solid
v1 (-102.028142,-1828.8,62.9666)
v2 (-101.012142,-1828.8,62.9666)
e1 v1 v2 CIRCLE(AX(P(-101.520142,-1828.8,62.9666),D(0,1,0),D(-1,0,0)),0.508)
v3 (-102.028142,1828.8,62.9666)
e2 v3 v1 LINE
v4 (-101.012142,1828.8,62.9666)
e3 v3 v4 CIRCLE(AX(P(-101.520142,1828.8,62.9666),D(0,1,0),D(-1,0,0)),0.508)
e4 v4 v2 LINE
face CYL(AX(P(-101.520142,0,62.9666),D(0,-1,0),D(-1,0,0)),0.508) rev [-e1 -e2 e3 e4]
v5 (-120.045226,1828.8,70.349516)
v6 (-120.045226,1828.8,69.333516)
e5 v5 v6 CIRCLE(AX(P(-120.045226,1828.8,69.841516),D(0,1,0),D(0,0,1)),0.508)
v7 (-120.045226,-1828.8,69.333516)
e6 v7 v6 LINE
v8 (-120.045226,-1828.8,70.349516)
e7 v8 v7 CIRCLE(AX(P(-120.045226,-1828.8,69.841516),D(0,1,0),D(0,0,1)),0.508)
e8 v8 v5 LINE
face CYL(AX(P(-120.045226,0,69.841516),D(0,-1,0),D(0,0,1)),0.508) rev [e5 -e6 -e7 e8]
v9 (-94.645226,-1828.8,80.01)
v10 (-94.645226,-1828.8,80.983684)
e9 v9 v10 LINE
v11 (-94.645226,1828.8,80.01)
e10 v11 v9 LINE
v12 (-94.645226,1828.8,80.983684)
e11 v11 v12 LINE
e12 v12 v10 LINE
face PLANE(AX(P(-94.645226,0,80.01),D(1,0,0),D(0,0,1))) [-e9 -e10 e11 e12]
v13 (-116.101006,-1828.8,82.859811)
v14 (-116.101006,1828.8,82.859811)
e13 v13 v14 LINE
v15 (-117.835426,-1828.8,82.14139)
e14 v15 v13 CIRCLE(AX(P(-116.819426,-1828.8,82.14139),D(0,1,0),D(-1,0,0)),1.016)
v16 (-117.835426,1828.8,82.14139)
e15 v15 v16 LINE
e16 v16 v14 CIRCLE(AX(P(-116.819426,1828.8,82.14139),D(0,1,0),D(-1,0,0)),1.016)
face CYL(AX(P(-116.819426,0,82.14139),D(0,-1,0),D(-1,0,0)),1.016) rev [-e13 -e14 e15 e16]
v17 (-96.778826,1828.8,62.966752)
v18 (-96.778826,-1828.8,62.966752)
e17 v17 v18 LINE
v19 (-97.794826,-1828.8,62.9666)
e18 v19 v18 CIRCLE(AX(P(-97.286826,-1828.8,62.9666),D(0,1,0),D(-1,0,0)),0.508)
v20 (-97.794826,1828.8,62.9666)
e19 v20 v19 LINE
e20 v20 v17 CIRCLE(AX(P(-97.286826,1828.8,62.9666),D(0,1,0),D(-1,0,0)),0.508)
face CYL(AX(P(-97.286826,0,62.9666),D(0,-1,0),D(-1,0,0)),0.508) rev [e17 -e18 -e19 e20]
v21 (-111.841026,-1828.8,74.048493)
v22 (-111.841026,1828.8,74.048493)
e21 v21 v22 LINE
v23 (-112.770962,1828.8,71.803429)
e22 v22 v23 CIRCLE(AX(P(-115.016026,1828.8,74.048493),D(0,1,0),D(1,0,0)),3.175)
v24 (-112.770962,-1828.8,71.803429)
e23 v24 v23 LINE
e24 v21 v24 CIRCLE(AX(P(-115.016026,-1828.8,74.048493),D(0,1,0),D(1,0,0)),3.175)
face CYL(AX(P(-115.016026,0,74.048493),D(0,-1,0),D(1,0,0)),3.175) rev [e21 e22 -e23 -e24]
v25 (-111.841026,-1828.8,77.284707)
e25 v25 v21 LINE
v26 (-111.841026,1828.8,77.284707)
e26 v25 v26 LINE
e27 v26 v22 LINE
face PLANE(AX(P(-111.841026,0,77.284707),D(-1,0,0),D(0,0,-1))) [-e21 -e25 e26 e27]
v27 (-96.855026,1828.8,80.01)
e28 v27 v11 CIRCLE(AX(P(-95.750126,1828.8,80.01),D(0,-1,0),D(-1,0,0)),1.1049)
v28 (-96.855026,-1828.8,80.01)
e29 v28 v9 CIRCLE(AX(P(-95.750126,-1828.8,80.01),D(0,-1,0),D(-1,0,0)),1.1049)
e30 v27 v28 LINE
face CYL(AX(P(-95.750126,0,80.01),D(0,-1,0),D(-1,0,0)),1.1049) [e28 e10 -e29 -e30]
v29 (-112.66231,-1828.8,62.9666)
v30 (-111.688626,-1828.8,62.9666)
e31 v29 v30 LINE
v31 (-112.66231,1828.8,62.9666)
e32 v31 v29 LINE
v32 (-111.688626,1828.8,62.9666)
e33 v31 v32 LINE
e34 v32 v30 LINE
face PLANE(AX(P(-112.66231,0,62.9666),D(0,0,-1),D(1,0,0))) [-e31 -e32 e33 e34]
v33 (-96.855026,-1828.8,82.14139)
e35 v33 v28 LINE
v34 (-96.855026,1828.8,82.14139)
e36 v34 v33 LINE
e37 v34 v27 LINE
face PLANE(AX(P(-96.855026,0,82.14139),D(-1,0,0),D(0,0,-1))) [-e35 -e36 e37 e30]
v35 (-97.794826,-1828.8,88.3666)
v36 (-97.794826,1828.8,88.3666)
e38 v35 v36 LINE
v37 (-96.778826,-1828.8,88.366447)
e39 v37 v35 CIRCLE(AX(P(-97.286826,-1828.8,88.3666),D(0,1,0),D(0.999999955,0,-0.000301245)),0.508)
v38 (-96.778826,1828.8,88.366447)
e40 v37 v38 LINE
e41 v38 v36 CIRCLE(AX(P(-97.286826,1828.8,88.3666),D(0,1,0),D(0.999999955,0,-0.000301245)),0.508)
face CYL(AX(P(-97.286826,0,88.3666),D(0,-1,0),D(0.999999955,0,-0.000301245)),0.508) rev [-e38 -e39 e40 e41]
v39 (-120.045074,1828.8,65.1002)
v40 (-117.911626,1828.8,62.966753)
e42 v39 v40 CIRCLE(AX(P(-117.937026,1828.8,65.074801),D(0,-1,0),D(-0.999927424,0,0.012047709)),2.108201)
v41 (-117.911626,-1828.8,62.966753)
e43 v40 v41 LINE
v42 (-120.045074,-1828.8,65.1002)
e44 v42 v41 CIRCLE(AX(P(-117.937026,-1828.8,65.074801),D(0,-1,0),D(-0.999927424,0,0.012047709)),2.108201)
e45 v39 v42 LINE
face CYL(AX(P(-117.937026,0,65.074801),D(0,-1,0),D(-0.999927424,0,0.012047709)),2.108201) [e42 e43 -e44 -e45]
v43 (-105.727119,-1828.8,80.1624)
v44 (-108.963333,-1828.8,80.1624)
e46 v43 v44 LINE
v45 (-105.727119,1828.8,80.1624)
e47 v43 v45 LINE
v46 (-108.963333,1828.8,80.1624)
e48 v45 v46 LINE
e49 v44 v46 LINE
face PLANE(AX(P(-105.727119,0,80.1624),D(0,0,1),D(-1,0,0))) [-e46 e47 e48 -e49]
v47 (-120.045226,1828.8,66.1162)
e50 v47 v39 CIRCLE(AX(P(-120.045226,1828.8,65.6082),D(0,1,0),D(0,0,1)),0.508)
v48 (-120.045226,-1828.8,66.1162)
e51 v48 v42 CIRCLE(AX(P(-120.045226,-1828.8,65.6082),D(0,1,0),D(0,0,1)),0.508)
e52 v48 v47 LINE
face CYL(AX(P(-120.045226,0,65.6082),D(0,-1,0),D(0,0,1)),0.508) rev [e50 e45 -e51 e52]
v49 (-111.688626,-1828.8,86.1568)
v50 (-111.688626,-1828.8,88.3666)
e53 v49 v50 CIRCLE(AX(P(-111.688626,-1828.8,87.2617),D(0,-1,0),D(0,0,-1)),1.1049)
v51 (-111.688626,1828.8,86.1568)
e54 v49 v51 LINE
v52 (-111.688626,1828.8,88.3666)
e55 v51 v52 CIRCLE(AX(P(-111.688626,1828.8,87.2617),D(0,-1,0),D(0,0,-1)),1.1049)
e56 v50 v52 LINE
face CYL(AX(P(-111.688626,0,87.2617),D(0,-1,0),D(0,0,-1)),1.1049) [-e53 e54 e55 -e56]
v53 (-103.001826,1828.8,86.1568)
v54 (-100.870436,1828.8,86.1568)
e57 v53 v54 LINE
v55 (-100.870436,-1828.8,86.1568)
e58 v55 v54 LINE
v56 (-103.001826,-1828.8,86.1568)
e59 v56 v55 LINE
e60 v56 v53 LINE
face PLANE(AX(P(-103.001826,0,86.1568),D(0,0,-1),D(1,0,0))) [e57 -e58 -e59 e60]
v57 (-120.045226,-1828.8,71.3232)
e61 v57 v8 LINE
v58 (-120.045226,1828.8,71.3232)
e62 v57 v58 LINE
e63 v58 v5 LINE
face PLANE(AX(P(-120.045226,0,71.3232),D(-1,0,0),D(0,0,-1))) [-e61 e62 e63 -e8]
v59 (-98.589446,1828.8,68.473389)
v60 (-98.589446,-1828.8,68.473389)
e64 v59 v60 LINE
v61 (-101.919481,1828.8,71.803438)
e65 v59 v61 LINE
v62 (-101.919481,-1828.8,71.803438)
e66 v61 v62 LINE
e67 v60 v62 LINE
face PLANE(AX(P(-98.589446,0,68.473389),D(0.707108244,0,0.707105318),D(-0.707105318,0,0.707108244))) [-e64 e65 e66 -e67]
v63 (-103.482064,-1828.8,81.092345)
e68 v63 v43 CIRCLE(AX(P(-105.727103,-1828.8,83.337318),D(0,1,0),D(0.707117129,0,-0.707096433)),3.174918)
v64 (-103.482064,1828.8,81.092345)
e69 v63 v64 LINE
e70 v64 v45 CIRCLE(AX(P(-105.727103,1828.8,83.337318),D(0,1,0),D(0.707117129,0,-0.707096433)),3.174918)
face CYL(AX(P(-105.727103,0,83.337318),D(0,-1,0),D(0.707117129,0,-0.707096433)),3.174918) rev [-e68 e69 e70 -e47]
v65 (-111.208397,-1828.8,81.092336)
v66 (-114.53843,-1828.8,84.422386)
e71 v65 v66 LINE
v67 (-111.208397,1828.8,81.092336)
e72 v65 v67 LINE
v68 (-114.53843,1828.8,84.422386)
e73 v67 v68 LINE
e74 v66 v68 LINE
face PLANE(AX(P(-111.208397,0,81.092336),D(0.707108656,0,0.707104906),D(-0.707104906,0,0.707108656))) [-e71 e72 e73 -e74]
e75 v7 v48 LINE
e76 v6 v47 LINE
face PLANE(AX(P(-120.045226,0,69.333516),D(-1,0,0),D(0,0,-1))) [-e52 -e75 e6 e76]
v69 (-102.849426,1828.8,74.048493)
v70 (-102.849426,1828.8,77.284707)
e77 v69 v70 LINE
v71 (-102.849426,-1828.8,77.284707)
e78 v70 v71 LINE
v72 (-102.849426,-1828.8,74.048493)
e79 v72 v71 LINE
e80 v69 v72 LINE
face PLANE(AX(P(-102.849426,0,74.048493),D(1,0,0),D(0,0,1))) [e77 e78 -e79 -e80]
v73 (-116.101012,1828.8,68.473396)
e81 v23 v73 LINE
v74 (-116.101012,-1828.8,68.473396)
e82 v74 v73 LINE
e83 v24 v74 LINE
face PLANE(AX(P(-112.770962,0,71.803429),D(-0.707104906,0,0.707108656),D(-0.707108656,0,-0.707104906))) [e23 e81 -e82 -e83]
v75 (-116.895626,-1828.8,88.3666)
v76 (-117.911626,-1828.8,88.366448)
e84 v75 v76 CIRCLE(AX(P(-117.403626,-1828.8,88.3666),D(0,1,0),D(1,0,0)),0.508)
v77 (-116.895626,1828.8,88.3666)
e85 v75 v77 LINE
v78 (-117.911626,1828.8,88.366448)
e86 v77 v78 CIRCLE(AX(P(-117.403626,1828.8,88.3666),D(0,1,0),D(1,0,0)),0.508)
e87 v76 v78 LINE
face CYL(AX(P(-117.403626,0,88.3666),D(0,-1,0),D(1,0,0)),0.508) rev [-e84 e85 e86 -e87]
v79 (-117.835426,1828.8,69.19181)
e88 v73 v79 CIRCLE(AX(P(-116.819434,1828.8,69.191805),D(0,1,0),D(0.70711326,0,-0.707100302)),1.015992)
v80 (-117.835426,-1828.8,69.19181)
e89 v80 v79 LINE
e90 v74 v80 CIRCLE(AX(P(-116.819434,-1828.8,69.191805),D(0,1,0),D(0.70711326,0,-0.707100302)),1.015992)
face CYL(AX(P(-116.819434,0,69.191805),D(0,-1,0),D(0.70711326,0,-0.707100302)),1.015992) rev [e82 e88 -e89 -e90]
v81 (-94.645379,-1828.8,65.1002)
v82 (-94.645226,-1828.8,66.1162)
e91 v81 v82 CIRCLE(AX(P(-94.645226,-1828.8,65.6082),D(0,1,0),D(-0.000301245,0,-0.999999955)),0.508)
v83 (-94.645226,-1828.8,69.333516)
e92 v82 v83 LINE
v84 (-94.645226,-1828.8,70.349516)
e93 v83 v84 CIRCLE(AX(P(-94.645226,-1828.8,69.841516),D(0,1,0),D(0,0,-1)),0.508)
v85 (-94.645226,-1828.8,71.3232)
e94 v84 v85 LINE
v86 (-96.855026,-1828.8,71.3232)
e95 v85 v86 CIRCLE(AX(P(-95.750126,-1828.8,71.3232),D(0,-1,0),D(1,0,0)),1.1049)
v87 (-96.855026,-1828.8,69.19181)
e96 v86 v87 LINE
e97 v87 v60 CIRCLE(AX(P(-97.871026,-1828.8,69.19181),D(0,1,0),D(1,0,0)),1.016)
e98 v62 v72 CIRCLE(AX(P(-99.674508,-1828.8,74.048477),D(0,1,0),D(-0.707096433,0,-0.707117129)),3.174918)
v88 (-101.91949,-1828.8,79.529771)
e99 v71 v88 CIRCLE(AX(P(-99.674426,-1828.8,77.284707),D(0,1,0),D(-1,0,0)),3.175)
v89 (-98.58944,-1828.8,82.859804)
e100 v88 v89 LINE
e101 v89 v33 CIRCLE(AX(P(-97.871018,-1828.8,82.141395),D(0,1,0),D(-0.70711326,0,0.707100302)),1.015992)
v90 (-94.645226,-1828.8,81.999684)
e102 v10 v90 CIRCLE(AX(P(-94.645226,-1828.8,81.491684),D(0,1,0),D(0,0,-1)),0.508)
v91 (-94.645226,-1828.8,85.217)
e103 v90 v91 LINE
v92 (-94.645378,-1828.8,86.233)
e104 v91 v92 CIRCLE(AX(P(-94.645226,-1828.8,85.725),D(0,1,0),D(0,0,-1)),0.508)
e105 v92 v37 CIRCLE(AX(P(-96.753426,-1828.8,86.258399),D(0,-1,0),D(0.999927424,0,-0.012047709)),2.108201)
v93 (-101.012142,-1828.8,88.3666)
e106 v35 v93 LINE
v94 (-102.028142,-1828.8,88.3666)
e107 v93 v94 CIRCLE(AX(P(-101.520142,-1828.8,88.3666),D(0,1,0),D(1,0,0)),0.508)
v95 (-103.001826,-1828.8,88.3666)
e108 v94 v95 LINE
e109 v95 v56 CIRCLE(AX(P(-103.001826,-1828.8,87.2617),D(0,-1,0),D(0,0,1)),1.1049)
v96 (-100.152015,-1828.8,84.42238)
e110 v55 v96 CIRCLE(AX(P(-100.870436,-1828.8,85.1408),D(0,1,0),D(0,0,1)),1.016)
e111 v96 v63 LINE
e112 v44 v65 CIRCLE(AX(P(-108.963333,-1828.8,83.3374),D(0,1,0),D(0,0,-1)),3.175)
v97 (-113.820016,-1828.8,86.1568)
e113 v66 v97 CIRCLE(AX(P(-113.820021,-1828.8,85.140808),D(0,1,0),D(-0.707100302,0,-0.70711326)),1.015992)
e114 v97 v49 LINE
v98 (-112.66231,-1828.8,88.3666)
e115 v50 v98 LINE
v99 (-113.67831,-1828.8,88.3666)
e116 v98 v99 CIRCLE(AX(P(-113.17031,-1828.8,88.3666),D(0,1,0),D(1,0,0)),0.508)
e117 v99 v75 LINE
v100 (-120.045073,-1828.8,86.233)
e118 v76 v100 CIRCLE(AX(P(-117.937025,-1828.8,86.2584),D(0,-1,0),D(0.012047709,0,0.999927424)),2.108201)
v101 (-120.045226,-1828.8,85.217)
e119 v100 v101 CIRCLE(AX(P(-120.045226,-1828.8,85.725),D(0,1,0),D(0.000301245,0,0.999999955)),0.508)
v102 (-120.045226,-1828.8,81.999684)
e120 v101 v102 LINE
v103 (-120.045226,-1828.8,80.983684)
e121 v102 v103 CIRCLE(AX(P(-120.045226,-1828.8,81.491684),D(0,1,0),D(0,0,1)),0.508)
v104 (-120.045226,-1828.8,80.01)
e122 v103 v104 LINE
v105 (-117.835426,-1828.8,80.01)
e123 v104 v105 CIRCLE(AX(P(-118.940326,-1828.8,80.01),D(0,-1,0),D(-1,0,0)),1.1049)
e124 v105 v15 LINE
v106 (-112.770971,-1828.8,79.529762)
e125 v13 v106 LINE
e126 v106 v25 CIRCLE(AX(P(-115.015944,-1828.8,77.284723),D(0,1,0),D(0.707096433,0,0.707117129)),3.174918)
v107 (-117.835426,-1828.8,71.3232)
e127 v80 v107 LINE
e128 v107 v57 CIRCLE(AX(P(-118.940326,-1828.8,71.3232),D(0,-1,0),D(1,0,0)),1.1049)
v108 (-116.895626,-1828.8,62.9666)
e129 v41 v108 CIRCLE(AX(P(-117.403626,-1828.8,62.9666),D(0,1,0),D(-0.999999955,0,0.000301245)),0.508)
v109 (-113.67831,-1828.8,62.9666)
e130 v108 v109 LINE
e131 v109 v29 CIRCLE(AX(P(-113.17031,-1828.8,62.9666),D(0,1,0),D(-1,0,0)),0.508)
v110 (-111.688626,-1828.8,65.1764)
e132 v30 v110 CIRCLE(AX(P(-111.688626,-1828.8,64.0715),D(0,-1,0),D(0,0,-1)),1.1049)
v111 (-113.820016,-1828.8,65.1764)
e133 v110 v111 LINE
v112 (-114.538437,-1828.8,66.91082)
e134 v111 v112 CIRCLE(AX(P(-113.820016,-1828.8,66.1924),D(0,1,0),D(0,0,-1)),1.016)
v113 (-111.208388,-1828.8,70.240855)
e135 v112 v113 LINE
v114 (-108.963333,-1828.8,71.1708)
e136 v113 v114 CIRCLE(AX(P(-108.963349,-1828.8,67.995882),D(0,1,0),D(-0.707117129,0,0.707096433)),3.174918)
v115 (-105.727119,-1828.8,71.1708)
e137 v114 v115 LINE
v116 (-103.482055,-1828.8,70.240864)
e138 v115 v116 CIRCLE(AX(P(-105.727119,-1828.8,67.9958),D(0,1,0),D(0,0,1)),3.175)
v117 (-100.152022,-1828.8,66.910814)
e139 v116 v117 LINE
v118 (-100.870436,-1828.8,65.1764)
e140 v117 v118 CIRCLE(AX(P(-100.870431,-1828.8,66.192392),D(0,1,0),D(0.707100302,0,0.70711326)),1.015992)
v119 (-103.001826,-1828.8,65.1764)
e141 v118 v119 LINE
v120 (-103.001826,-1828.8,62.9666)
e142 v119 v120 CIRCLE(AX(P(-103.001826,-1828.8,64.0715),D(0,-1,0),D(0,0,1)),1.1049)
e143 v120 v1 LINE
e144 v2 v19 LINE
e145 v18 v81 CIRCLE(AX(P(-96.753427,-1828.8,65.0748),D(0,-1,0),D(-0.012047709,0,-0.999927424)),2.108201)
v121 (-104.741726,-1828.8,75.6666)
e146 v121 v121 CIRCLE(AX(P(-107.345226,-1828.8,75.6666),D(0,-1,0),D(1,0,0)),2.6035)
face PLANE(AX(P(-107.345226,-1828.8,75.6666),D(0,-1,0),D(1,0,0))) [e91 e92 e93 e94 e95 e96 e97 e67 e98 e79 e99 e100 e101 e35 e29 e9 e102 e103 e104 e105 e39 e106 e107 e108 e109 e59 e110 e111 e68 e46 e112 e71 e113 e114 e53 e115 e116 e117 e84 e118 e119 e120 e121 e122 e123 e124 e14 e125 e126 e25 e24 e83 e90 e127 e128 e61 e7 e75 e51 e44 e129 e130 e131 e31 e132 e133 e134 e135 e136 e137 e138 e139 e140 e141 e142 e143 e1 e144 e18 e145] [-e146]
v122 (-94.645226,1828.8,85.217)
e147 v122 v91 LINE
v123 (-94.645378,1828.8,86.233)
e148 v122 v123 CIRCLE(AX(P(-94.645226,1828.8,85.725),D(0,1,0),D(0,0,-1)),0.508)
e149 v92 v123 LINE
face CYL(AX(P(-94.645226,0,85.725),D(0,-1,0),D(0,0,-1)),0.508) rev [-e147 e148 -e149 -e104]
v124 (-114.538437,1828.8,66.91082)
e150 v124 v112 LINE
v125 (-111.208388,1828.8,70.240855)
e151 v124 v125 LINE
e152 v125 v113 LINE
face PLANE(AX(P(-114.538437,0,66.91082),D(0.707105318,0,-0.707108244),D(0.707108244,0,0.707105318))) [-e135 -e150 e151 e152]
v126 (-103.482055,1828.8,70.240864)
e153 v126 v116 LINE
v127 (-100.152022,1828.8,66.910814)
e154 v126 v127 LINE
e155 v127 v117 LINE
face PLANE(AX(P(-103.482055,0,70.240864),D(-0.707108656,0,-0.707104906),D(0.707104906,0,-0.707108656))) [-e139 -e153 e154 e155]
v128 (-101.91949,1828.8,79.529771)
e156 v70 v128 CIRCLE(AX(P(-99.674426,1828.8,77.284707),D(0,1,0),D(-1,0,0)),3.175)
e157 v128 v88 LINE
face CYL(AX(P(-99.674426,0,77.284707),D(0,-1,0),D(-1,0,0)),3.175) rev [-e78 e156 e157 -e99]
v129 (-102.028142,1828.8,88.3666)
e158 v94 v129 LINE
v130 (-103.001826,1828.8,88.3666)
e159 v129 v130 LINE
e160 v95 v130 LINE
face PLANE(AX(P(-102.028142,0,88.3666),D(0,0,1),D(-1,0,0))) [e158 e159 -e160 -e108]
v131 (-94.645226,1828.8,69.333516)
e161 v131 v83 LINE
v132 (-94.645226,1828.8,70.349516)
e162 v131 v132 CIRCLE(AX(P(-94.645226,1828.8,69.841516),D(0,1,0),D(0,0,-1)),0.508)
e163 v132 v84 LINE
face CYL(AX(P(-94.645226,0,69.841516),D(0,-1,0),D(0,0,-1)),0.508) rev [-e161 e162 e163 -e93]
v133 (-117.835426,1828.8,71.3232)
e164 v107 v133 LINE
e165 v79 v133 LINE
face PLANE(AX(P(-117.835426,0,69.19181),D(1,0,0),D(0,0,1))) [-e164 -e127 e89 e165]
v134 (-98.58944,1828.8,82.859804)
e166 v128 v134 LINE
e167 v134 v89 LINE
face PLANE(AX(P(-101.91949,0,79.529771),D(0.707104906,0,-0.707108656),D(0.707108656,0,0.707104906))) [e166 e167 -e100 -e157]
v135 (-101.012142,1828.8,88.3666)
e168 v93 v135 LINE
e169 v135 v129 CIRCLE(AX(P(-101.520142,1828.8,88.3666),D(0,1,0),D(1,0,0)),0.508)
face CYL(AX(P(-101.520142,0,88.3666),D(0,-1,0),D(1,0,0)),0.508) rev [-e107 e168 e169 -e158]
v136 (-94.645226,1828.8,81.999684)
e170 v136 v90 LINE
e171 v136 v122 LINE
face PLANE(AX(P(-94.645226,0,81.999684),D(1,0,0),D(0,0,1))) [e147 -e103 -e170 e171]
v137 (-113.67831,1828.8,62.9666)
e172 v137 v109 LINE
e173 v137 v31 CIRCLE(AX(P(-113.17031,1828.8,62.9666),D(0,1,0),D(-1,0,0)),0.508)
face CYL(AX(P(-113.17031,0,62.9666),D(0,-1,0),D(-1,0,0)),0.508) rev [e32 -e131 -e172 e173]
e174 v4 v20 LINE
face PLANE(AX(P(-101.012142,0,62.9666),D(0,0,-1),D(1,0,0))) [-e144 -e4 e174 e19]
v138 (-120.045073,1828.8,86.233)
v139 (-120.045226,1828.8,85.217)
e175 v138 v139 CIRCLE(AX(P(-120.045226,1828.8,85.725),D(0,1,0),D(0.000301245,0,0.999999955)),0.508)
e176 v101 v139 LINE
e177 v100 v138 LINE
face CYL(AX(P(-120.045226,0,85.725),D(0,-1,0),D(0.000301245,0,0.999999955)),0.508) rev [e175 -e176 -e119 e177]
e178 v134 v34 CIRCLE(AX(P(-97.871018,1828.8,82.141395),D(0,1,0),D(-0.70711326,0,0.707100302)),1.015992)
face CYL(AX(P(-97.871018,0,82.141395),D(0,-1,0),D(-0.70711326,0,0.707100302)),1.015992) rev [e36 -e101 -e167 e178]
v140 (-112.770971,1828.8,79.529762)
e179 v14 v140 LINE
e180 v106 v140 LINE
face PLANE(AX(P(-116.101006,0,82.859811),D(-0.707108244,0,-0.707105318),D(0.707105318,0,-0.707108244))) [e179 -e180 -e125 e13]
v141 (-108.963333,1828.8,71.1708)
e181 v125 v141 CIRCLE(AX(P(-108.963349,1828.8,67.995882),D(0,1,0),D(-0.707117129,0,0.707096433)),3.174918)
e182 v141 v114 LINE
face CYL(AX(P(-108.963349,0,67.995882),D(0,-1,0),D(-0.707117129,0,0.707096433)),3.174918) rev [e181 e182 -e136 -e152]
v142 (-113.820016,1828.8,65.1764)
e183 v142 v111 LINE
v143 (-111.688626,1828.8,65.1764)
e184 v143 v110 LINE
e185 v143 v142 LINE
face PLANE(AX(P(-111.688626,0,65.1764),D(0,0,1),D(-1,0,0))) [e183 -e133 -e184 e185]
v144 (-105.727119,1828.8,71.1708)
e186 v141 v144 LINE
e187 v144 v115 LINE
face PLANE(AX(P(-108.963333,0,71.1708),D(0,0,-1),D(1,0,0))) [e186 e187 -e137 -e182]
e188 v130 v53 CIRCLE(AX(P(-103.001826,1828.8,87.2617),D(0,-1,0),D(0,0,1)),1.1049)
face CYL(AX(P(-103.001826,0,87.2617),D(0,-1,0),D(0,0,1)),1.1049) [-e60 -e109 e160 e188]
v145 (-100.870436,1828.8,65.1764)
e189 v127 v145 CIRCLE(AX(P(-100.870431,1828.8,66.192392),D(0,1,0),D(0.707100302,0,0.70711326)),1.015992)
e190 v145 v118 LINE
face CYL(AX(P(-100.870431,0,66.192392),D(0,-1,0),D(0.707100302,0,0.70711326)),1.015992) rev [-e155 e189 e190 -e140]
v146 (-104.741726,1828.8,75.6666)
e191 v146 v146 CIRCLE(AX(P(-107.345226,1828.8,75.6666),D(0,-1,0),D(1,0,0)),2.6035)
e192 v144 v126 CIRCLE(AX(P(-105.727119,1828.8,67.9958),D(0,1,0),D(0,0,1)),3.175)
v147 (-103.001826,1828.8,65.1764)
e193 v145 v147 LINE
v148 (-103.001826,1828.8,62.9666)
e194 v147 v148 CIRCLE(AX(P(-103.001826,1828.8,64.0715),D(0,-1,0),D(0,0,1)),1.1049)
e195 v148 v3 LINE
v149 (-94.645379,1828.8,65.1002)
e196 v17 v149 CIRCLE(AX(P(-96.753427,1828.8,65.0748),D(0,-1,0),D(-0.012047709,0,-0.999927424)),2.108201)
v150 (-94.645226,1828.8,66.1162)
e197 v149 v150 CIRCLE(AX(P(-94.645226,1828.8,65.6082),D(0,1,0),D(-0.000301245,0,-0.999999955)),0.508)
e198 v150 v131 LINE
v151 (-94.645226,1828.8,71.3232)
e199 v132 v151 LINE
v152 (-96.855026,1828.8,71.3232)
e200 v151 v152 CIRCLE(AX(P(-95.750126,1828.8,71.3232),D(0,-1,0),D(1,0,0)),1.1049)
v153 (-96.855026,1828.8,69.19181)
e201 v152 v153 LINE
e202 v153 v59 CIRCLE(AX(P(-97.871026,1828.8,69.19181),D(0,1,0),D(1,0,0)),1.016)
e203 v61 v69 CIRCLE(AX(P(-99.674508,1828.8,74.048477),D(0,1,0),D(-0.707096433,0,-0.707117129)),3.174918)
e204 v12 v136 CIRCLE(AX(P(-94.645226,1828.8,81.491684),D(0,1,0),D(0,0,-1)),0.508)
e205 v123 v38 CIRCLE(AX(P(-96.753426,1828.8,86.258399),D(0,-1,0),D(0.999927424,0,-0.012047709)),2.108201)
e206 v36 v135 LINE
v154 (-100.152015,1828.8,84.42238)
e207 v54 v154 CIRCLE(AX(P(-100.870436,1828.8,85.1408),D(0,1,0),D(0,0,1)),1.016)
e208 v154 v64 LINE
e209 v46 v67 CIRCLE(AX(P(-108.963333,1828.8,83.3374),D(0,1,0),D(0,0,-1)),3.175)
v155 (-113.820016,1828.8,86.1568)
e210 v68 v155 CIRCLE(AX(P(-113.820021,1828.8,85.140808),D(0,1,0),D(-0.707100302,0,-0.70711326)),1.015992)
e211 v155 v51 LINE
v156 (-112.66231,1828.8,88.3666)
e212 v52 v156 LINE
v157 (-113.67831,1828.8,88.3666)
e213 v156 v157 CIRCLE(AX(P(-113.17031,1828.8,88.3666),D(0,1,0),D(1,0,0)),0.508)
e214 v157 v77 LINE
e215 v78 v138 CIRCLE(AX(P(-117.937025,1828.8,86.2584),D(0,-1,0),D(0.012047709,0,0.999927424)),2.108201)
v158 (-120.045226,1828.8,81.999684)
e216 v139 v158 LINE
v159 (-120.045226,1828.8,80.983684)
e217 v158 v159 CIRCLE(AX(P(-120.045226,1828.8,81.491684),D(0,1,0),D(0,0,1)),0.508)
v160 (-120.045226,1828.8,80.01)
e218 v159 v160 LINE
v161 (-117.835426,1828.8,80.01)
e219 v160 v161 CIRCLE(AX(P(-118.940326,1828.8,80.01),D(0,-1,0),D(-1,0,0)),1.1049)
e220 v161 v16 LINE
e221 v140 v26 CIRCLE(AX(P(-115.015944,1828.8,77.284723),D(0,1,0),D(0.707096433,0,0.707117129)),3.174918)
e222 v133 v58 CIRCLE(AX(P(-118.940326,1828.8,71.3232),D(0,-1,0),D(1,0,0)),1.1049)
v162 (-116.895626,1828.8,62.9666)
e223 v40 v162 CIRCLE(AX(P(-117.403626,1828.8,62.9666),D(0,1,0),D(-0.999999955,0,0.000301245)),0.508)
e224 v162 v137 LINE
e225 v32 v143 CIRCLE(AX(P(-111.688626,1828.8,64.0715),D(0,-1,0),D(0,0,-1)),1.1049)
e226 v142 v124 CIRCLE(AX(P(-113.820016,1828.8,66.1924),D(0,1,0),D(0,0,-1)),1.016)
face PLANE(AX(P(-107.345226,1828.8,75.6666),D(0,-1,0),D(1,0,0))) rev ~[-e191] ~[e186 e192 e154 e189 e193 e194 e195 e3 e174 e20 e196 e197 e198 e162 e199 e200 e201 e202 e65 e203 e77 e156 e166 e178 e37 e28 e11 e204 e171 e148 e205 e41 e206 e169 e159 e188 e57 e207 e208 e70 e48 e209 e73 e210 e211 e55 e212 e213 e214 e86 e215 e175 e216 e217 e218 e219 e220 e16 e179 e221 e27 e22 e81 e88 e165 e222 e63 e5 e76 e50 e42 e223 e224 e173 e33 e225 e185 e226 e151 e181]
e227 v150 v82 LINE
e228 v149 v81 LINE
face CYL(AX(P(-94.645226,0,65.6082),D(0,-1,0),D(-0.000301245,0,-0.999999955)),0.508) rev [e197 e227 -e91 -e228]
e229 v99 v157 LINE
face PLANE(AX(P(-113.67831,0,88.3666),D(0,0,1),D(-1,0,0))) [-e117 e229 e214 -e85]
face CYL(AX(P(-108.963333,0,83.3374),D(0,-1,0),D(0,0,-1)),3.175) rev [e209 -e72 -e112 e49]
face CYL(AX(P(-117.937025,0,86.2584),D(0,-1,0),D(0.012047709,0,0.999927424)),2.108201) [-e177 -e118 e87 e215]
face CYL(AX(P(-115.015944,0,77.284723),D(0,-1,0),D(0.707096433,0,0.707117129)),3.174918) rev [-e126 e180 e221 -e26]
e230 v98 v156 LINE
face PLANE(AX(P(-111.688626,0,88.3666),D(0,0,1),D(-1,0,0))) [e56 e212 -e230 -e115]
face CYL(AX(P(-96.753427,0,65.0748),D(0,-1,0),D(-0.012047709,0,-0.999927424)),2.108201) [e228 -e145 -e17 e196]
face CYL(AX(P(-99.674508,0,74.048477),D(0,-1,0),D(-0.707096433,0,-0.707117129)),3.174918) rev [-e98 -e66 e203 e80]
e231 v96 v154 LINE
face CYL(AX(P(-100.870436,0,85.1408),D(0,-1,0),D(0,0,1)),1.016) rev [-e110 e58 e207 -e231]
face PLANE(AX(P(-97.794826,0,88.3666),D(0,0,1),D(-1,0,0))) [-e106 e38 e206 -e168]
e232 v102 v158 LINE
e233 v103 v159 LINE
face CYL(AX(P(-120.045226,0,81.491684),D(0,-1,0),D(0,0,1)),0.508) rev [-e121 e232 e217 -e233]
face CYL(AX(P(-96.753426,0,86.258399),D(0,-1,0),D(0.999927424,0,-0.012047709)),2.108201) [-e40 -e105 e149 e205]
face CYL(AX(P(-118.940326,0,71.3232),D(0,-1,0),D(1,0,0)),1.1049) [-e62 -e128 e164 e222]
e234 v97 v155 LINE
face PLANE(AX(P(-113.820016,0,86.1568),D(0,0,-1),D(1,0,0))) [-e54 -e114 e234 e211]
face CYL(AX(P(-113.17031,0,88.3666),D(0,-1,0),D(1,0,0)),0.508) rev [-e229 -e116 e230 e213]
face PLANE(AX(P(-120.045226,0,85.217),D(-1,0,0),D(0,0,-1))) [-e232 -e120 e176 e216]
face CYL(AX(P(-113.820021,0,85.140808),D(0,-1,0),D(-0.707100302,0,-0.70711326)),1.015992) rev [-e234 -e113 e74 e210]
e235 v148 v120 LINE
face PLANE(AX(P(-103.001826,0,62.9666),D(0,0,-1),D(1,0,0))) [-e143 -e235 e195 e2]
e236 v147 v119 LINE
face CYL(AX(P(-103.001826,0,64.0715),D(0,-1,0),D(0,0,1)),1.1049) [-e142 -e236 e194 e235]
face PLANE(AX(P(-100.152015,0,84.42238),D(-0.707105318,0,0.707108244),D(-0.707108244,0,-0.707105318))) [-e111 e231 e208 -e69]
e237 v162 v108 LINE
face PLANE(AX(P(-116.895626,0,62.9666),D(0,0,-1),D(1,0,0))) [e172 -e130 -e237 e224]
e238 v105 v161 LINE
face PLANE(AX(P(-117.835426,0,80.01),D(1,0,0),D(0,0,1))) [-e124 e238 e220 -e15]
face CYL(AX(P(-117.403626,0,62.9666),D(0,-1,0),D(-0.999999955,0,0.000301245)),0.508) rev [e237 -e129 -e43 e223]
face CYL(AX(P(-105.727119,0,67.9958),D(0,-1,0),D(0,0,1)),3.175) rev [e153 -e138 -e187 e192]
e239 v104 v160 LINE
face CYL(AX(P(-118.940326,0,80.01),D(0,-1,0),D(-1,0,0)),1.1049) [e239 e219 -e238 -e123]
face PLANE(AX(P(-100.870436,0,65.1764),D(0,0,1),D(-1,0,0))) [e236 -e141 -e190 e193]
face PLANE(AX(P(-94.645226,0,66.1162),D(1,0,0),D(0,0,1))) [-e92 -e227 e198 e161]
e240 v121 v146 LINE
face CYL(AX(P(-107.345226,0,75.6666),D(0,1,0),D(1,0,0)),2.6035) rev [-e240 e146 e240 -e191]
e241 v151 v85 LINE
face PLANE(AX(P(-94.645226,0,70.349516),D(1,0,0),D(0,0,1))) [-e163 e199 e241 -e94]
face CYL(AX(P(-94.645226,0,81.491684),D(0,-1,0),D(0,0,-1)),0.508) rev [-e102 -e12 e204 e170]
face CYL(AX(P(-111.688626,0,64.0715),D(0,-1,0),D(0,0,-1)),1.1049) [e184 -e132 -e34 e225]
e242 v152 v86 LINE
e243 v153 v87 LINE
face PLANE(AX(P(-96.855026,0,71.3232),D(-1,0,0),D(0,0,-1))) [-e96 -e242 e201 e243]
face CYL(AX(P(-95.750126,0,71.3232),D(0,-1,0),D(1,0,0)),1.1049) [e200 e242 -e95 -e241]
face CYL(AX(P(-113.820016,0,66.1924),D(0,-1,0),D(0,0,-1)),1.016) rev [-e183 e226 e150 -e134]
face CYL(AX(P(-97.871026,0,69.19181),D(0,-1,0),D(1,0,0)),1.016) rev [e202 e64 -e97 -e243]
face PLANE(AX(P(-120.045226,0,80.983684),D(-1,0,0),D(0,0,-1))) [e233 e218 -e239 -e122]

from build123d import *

# Parameters (mm, degrees)
F0_R     = 2.6035
F1_DEPTH = 1828.8


# Not quite as in the source:
# - ends of sketch curves that miss each other by under 0.0002 mm in the source are joined


with BuildPart() as f1:
    # F0 (on Front) → F1 (new body, symmetric)
    with BuildSketch(Plane.XZ):
        with BuildLine():
            ThreePointArc((-120.045226, 66.1162), (-119.5372260057, 65.6082762), (-120.0450736, 65.1002000229))
            ThreePointArc((-120.0450736, 65.1002000229), (-119.4277485161, 63.5840774839), (-117.9116260074, 62.9667530175))
            ThreePointArc((-117.9116260074, 62.9667530175), (-117.4035498, 63.4745999943), (-116.895626, 62.9666))
            Line((-116.895626, 62.9666), (-113.6783096, 62.9666))
            ThreePointArc((-113.6783096, 62.9666), (-113.1703096, 63.4746), (-112.6623096, 62.9666))
            Line((-112.6623096, 62.9666), (-111.688626, 62.9666))
            ThreePointArc((-111.688626, 62.9666), (-110.583726, 64.0715), (-111.688626, 65.1764))
            Line((-111.688626, 65.1764), (-113.8200162, 65.1764))
            ThreePointArc((-113.8200162, 65.1764), (-114.758677805, 65.8035936327), (-114.5384366897, 66.9108204897))
            Line((-114.5384366897, 66.9108204897), (-111.2083882, 70.2408552))
            ThreePointArc((-111.2083882, 70.2408552), (-110.1783528978, 70.9291175157), (-108.963333, 71.1708))
            Line((-108.963333, 71.1708), (-105.727119, 71.1708))
            ThreePointArc((-105.727119, 71.1708), (-104.5120991022, 70.9291175157), (-103.4820549697, 70.2408640303))
            Line((-103.4820549697, 70.2408640303), (-100.1520222, 66.9108136))
            ThreePointArc((-100.1520222, 66.9108136), (-99.931774195, 65.8035936327), (-100.8704358, 65.1764))
            Line((-100.8704358, 65.1764), (-103.001826, 65.1764))
            ThreePointArc((-103.001826, 65.1764), (-104.106726, 64.0715), (-103.001826, 62.9666))
            Line((-103.001826, 62.9666), (-102.0281424, 62.9666))
            ThreePointArc((-102.0281424, 62.9666), (-101.5201424, 63.4746), (-101.0121424, 62.9666))
            Line((-101.0121424, 62.9666), (-97.794826, 62.9666))
            ThreePointArc((-97.794826, 62.9666), (-97.2869022, 63.4745999943), (-96.7788260229, 62.9667524))
            ThreePointArc((-96.7788260229, 62.9667524), (-95.2627034839, 63.5840774839), (-94.6453790175, 65.1001999926))
            ThreePointArc((-94.6453790175, 65.1001999926), (-95.1532259943, 65.6082762), (-94.645226, 66.1162))
            Line((-94.645226, 66.1162), (-94.645226, 69.3335164))
            ThreePointArc((-94.645226, 69.3335164), (-95.153226, 69.8415164), (-94.645226, 70.3495164))
            Line((-94.645226, 70.3495164), (-94.645226, 71.3232))
            ThreePointArc((-94.645226, 71.3232), (-95.750126, 72.4281), (-96.855026, 71.3232))
            Line((-96.855026, 71.3232), (-96.855026, 69.1918098))
            ThreePointArc((-96.855026, 69.1918098), (-97.4822196327, 68.253148195), (-98.5894464897, 68.4733893103))
            Line((-98.5894464897, 68.4733893103), (-101.9194812, 71.8034378))
            ThreePointArc((-101.9194812, 71.8034378), (-102.6077435157, 72.8334731022), (-102.849426, 74.048493))
            Line((-102.849426, 74.048493), (-102.849426, 77.284707))
            ThreePointArc((-102.849426, 77.284707), (-102.6077435157, 78.4997268978), (-101.9194900303, 79.5297710303))
            Line((-101.9194900303, 79.5297710303), (-98.5894396, 82.8598038))
            ThreePointArc((-98.5894396, 82.8598038), (-97.4822196327, 83.080051805), (-96.855026, 82.1413902))
            Line((-96.855026, 82.1413902), (-96.855026, 80.01))
            ThreePointArc((-96.855026, 80.01), (-95.750126, 78.9051), (-94.645226, 80.01))
            Line((-94.645226, 80.01), (-94.645226, 80.9836836))
            ThreePointArc((-94.645226, 80.9836836), (-95.153226, 81.4916836), (-94.645226, 81.9996836))
            Line((-94.645226, 81.9996836), (-94.645226, 85.217))
            ThreePointArc((-94.645226, 85.217), (-95.1532259943, 85.7249238), (-94.6453784, 86.2329999771))
            ThreePointArc((-94.6453784, 86.2329999771), (-95.2627034839, 87.7491225161), (-96.7788259926, 88.3664469825))
            ThreePointArc((-96.7788259926, 88.3664469825), (-97.2869022, 87.8586000057), (-97.794826, 88.3666))
            Line((-97.794826, 88.3666), (-101.0121424, 88.3666))
            ThreePointArc((-101.0121424, 88.3666), (-101.5201424, 87.8586), (-102.0281424, 88.3666))
            Line((-102.0281424, 88.3666), (-103.001826, 88.3666))
            ThreePointArc((-103.001826, 88.3666), (-104.106726, 87.2617), (-103.001826, 86.1568))
            Line((-103.001826, 86.1568), (-100.8704358, 86.1568))
            ThreePointArc((-100.8704358, 86.1568), (-99.931774195, 85.5296063673), (-100.1520153103, 84.4223795103))
            Line((-100.1520153103, 84.4223795103), (-103.4820638, 81.0923448))
            ThreePointArc((-103.4820638, 81.0923448), (-104.5120991022, 80.4040824843), (-105.727119, 80.1624))
            Line((-105.727119, 80.1624), (-108.963333, 80.1624))
            ThreePointArc((-108.963333, 80.1624), (-110.1783528978, 80.4040824843), (-111.2083970303, 81.0923359697))
            Line((-111.2083970303, 81.0923359697), (-114.5384298, 84.4223864))
            ThreePointArc((-114.5384298, 84.4223864), (-114.758677805, 85.5296063673), (-113.8200162, 86.1568))
            Line((-113.8200162, 86.1568), (-111.688626, 86.1568))
            ThreePointArc((-111.688626, 86.1568), (-110.583726, 87.2617), (-111.688626, 88.3666))
            Line((-111.688626, 88.3666), (-112.6623096, 88.3666))
            ThreePointArc((-112.6623096, 88.3666), (-113.1703096, 87.8586), (-113.6783096, 88.3666))
            Line((-113.6783096, 88.3666), (-116.895626, 88.3666))
            ThreePointArc((-116.895626, 88.3666), (-117.4035498, 87.8586000057), (-117.9116259771, 88.3664476))
            ThreePointArc((-117.9116259771, 88.3664476), (-119.4277485161, 87.7491225161), (-120.0450729825, 86.2330000074))
            ThreePointArc((-120.0450729825, 86.2330000074), (-119.5372260057, 85.7249238), (-120.045226, 85.217))
            Line((-120.045226, 85.217), (-120.045226, 81.9996836))
            ThreePointArc((-120.045226, 81.9996836), (-119.537226, 81.4916836), (-120.045226, 80.9836836))
            Line((-120.045226, 80.9836836), (-120.045226, 80.01))
            ThreePointArc((-120.045226, 80.01), (-118.940326, 78.9051), (-117.835426, 80.01))
            Line((-117.835426, 80.01), (-117.835426, 82.1413902))
            ThreePointArc((-117.835426, 82.1413902), (-117.2082323673, 83.080051805), (-116.1010055103, 82.8598106897))
            Line((-116.1010055103, 82.8598106897), (-112.7709708, 79.5297622))
            ThreePointArc((-112.7709708, 79.5297622), (-112.0827084843, 78.4997268978), (-111.841026, 77.284707))
            Line((-111.841026, 77.284707), (-111.841026, 74.048493))
            ThreePointArc((-111.841026, 74.048493), (-112.0827084843, 72.8334731022), (-112.7709619697, 71.8034289697))
            Line((-112.7709619697, 71.8034289697), (-116.1010124, 68.4733962))
            ThreePointArc((-116.1010124, 68.4733962), (-117.2082323673, 68.253148195), (-117.835426, 69.1918098))
            Line((-117.835426, 69.1918098), (-117.835426, 71.3232))
            ThreePointArc((-117.835426, 71.3232), (-118.940326, 72.4281), (-120.045226, 71.3232))
            Line((-120.045226, 71.3232), (-120.045226, 70.3495164))
            ThreePointArc((-120.045226, 70.3495164), (-119.537226, 69.8415164), (-120.045226, 69.3335164))
            Line((-120.045226, 69.3335164), (-120.045226, 66.1162))
        make_face()
        with Locations((-107.345226, 75.6666)):
            Circle(F0_R, mode=Mode.SUBTRACT)
    extrude(amount=F1_DEPTH, both=True)


solid = f1.part
